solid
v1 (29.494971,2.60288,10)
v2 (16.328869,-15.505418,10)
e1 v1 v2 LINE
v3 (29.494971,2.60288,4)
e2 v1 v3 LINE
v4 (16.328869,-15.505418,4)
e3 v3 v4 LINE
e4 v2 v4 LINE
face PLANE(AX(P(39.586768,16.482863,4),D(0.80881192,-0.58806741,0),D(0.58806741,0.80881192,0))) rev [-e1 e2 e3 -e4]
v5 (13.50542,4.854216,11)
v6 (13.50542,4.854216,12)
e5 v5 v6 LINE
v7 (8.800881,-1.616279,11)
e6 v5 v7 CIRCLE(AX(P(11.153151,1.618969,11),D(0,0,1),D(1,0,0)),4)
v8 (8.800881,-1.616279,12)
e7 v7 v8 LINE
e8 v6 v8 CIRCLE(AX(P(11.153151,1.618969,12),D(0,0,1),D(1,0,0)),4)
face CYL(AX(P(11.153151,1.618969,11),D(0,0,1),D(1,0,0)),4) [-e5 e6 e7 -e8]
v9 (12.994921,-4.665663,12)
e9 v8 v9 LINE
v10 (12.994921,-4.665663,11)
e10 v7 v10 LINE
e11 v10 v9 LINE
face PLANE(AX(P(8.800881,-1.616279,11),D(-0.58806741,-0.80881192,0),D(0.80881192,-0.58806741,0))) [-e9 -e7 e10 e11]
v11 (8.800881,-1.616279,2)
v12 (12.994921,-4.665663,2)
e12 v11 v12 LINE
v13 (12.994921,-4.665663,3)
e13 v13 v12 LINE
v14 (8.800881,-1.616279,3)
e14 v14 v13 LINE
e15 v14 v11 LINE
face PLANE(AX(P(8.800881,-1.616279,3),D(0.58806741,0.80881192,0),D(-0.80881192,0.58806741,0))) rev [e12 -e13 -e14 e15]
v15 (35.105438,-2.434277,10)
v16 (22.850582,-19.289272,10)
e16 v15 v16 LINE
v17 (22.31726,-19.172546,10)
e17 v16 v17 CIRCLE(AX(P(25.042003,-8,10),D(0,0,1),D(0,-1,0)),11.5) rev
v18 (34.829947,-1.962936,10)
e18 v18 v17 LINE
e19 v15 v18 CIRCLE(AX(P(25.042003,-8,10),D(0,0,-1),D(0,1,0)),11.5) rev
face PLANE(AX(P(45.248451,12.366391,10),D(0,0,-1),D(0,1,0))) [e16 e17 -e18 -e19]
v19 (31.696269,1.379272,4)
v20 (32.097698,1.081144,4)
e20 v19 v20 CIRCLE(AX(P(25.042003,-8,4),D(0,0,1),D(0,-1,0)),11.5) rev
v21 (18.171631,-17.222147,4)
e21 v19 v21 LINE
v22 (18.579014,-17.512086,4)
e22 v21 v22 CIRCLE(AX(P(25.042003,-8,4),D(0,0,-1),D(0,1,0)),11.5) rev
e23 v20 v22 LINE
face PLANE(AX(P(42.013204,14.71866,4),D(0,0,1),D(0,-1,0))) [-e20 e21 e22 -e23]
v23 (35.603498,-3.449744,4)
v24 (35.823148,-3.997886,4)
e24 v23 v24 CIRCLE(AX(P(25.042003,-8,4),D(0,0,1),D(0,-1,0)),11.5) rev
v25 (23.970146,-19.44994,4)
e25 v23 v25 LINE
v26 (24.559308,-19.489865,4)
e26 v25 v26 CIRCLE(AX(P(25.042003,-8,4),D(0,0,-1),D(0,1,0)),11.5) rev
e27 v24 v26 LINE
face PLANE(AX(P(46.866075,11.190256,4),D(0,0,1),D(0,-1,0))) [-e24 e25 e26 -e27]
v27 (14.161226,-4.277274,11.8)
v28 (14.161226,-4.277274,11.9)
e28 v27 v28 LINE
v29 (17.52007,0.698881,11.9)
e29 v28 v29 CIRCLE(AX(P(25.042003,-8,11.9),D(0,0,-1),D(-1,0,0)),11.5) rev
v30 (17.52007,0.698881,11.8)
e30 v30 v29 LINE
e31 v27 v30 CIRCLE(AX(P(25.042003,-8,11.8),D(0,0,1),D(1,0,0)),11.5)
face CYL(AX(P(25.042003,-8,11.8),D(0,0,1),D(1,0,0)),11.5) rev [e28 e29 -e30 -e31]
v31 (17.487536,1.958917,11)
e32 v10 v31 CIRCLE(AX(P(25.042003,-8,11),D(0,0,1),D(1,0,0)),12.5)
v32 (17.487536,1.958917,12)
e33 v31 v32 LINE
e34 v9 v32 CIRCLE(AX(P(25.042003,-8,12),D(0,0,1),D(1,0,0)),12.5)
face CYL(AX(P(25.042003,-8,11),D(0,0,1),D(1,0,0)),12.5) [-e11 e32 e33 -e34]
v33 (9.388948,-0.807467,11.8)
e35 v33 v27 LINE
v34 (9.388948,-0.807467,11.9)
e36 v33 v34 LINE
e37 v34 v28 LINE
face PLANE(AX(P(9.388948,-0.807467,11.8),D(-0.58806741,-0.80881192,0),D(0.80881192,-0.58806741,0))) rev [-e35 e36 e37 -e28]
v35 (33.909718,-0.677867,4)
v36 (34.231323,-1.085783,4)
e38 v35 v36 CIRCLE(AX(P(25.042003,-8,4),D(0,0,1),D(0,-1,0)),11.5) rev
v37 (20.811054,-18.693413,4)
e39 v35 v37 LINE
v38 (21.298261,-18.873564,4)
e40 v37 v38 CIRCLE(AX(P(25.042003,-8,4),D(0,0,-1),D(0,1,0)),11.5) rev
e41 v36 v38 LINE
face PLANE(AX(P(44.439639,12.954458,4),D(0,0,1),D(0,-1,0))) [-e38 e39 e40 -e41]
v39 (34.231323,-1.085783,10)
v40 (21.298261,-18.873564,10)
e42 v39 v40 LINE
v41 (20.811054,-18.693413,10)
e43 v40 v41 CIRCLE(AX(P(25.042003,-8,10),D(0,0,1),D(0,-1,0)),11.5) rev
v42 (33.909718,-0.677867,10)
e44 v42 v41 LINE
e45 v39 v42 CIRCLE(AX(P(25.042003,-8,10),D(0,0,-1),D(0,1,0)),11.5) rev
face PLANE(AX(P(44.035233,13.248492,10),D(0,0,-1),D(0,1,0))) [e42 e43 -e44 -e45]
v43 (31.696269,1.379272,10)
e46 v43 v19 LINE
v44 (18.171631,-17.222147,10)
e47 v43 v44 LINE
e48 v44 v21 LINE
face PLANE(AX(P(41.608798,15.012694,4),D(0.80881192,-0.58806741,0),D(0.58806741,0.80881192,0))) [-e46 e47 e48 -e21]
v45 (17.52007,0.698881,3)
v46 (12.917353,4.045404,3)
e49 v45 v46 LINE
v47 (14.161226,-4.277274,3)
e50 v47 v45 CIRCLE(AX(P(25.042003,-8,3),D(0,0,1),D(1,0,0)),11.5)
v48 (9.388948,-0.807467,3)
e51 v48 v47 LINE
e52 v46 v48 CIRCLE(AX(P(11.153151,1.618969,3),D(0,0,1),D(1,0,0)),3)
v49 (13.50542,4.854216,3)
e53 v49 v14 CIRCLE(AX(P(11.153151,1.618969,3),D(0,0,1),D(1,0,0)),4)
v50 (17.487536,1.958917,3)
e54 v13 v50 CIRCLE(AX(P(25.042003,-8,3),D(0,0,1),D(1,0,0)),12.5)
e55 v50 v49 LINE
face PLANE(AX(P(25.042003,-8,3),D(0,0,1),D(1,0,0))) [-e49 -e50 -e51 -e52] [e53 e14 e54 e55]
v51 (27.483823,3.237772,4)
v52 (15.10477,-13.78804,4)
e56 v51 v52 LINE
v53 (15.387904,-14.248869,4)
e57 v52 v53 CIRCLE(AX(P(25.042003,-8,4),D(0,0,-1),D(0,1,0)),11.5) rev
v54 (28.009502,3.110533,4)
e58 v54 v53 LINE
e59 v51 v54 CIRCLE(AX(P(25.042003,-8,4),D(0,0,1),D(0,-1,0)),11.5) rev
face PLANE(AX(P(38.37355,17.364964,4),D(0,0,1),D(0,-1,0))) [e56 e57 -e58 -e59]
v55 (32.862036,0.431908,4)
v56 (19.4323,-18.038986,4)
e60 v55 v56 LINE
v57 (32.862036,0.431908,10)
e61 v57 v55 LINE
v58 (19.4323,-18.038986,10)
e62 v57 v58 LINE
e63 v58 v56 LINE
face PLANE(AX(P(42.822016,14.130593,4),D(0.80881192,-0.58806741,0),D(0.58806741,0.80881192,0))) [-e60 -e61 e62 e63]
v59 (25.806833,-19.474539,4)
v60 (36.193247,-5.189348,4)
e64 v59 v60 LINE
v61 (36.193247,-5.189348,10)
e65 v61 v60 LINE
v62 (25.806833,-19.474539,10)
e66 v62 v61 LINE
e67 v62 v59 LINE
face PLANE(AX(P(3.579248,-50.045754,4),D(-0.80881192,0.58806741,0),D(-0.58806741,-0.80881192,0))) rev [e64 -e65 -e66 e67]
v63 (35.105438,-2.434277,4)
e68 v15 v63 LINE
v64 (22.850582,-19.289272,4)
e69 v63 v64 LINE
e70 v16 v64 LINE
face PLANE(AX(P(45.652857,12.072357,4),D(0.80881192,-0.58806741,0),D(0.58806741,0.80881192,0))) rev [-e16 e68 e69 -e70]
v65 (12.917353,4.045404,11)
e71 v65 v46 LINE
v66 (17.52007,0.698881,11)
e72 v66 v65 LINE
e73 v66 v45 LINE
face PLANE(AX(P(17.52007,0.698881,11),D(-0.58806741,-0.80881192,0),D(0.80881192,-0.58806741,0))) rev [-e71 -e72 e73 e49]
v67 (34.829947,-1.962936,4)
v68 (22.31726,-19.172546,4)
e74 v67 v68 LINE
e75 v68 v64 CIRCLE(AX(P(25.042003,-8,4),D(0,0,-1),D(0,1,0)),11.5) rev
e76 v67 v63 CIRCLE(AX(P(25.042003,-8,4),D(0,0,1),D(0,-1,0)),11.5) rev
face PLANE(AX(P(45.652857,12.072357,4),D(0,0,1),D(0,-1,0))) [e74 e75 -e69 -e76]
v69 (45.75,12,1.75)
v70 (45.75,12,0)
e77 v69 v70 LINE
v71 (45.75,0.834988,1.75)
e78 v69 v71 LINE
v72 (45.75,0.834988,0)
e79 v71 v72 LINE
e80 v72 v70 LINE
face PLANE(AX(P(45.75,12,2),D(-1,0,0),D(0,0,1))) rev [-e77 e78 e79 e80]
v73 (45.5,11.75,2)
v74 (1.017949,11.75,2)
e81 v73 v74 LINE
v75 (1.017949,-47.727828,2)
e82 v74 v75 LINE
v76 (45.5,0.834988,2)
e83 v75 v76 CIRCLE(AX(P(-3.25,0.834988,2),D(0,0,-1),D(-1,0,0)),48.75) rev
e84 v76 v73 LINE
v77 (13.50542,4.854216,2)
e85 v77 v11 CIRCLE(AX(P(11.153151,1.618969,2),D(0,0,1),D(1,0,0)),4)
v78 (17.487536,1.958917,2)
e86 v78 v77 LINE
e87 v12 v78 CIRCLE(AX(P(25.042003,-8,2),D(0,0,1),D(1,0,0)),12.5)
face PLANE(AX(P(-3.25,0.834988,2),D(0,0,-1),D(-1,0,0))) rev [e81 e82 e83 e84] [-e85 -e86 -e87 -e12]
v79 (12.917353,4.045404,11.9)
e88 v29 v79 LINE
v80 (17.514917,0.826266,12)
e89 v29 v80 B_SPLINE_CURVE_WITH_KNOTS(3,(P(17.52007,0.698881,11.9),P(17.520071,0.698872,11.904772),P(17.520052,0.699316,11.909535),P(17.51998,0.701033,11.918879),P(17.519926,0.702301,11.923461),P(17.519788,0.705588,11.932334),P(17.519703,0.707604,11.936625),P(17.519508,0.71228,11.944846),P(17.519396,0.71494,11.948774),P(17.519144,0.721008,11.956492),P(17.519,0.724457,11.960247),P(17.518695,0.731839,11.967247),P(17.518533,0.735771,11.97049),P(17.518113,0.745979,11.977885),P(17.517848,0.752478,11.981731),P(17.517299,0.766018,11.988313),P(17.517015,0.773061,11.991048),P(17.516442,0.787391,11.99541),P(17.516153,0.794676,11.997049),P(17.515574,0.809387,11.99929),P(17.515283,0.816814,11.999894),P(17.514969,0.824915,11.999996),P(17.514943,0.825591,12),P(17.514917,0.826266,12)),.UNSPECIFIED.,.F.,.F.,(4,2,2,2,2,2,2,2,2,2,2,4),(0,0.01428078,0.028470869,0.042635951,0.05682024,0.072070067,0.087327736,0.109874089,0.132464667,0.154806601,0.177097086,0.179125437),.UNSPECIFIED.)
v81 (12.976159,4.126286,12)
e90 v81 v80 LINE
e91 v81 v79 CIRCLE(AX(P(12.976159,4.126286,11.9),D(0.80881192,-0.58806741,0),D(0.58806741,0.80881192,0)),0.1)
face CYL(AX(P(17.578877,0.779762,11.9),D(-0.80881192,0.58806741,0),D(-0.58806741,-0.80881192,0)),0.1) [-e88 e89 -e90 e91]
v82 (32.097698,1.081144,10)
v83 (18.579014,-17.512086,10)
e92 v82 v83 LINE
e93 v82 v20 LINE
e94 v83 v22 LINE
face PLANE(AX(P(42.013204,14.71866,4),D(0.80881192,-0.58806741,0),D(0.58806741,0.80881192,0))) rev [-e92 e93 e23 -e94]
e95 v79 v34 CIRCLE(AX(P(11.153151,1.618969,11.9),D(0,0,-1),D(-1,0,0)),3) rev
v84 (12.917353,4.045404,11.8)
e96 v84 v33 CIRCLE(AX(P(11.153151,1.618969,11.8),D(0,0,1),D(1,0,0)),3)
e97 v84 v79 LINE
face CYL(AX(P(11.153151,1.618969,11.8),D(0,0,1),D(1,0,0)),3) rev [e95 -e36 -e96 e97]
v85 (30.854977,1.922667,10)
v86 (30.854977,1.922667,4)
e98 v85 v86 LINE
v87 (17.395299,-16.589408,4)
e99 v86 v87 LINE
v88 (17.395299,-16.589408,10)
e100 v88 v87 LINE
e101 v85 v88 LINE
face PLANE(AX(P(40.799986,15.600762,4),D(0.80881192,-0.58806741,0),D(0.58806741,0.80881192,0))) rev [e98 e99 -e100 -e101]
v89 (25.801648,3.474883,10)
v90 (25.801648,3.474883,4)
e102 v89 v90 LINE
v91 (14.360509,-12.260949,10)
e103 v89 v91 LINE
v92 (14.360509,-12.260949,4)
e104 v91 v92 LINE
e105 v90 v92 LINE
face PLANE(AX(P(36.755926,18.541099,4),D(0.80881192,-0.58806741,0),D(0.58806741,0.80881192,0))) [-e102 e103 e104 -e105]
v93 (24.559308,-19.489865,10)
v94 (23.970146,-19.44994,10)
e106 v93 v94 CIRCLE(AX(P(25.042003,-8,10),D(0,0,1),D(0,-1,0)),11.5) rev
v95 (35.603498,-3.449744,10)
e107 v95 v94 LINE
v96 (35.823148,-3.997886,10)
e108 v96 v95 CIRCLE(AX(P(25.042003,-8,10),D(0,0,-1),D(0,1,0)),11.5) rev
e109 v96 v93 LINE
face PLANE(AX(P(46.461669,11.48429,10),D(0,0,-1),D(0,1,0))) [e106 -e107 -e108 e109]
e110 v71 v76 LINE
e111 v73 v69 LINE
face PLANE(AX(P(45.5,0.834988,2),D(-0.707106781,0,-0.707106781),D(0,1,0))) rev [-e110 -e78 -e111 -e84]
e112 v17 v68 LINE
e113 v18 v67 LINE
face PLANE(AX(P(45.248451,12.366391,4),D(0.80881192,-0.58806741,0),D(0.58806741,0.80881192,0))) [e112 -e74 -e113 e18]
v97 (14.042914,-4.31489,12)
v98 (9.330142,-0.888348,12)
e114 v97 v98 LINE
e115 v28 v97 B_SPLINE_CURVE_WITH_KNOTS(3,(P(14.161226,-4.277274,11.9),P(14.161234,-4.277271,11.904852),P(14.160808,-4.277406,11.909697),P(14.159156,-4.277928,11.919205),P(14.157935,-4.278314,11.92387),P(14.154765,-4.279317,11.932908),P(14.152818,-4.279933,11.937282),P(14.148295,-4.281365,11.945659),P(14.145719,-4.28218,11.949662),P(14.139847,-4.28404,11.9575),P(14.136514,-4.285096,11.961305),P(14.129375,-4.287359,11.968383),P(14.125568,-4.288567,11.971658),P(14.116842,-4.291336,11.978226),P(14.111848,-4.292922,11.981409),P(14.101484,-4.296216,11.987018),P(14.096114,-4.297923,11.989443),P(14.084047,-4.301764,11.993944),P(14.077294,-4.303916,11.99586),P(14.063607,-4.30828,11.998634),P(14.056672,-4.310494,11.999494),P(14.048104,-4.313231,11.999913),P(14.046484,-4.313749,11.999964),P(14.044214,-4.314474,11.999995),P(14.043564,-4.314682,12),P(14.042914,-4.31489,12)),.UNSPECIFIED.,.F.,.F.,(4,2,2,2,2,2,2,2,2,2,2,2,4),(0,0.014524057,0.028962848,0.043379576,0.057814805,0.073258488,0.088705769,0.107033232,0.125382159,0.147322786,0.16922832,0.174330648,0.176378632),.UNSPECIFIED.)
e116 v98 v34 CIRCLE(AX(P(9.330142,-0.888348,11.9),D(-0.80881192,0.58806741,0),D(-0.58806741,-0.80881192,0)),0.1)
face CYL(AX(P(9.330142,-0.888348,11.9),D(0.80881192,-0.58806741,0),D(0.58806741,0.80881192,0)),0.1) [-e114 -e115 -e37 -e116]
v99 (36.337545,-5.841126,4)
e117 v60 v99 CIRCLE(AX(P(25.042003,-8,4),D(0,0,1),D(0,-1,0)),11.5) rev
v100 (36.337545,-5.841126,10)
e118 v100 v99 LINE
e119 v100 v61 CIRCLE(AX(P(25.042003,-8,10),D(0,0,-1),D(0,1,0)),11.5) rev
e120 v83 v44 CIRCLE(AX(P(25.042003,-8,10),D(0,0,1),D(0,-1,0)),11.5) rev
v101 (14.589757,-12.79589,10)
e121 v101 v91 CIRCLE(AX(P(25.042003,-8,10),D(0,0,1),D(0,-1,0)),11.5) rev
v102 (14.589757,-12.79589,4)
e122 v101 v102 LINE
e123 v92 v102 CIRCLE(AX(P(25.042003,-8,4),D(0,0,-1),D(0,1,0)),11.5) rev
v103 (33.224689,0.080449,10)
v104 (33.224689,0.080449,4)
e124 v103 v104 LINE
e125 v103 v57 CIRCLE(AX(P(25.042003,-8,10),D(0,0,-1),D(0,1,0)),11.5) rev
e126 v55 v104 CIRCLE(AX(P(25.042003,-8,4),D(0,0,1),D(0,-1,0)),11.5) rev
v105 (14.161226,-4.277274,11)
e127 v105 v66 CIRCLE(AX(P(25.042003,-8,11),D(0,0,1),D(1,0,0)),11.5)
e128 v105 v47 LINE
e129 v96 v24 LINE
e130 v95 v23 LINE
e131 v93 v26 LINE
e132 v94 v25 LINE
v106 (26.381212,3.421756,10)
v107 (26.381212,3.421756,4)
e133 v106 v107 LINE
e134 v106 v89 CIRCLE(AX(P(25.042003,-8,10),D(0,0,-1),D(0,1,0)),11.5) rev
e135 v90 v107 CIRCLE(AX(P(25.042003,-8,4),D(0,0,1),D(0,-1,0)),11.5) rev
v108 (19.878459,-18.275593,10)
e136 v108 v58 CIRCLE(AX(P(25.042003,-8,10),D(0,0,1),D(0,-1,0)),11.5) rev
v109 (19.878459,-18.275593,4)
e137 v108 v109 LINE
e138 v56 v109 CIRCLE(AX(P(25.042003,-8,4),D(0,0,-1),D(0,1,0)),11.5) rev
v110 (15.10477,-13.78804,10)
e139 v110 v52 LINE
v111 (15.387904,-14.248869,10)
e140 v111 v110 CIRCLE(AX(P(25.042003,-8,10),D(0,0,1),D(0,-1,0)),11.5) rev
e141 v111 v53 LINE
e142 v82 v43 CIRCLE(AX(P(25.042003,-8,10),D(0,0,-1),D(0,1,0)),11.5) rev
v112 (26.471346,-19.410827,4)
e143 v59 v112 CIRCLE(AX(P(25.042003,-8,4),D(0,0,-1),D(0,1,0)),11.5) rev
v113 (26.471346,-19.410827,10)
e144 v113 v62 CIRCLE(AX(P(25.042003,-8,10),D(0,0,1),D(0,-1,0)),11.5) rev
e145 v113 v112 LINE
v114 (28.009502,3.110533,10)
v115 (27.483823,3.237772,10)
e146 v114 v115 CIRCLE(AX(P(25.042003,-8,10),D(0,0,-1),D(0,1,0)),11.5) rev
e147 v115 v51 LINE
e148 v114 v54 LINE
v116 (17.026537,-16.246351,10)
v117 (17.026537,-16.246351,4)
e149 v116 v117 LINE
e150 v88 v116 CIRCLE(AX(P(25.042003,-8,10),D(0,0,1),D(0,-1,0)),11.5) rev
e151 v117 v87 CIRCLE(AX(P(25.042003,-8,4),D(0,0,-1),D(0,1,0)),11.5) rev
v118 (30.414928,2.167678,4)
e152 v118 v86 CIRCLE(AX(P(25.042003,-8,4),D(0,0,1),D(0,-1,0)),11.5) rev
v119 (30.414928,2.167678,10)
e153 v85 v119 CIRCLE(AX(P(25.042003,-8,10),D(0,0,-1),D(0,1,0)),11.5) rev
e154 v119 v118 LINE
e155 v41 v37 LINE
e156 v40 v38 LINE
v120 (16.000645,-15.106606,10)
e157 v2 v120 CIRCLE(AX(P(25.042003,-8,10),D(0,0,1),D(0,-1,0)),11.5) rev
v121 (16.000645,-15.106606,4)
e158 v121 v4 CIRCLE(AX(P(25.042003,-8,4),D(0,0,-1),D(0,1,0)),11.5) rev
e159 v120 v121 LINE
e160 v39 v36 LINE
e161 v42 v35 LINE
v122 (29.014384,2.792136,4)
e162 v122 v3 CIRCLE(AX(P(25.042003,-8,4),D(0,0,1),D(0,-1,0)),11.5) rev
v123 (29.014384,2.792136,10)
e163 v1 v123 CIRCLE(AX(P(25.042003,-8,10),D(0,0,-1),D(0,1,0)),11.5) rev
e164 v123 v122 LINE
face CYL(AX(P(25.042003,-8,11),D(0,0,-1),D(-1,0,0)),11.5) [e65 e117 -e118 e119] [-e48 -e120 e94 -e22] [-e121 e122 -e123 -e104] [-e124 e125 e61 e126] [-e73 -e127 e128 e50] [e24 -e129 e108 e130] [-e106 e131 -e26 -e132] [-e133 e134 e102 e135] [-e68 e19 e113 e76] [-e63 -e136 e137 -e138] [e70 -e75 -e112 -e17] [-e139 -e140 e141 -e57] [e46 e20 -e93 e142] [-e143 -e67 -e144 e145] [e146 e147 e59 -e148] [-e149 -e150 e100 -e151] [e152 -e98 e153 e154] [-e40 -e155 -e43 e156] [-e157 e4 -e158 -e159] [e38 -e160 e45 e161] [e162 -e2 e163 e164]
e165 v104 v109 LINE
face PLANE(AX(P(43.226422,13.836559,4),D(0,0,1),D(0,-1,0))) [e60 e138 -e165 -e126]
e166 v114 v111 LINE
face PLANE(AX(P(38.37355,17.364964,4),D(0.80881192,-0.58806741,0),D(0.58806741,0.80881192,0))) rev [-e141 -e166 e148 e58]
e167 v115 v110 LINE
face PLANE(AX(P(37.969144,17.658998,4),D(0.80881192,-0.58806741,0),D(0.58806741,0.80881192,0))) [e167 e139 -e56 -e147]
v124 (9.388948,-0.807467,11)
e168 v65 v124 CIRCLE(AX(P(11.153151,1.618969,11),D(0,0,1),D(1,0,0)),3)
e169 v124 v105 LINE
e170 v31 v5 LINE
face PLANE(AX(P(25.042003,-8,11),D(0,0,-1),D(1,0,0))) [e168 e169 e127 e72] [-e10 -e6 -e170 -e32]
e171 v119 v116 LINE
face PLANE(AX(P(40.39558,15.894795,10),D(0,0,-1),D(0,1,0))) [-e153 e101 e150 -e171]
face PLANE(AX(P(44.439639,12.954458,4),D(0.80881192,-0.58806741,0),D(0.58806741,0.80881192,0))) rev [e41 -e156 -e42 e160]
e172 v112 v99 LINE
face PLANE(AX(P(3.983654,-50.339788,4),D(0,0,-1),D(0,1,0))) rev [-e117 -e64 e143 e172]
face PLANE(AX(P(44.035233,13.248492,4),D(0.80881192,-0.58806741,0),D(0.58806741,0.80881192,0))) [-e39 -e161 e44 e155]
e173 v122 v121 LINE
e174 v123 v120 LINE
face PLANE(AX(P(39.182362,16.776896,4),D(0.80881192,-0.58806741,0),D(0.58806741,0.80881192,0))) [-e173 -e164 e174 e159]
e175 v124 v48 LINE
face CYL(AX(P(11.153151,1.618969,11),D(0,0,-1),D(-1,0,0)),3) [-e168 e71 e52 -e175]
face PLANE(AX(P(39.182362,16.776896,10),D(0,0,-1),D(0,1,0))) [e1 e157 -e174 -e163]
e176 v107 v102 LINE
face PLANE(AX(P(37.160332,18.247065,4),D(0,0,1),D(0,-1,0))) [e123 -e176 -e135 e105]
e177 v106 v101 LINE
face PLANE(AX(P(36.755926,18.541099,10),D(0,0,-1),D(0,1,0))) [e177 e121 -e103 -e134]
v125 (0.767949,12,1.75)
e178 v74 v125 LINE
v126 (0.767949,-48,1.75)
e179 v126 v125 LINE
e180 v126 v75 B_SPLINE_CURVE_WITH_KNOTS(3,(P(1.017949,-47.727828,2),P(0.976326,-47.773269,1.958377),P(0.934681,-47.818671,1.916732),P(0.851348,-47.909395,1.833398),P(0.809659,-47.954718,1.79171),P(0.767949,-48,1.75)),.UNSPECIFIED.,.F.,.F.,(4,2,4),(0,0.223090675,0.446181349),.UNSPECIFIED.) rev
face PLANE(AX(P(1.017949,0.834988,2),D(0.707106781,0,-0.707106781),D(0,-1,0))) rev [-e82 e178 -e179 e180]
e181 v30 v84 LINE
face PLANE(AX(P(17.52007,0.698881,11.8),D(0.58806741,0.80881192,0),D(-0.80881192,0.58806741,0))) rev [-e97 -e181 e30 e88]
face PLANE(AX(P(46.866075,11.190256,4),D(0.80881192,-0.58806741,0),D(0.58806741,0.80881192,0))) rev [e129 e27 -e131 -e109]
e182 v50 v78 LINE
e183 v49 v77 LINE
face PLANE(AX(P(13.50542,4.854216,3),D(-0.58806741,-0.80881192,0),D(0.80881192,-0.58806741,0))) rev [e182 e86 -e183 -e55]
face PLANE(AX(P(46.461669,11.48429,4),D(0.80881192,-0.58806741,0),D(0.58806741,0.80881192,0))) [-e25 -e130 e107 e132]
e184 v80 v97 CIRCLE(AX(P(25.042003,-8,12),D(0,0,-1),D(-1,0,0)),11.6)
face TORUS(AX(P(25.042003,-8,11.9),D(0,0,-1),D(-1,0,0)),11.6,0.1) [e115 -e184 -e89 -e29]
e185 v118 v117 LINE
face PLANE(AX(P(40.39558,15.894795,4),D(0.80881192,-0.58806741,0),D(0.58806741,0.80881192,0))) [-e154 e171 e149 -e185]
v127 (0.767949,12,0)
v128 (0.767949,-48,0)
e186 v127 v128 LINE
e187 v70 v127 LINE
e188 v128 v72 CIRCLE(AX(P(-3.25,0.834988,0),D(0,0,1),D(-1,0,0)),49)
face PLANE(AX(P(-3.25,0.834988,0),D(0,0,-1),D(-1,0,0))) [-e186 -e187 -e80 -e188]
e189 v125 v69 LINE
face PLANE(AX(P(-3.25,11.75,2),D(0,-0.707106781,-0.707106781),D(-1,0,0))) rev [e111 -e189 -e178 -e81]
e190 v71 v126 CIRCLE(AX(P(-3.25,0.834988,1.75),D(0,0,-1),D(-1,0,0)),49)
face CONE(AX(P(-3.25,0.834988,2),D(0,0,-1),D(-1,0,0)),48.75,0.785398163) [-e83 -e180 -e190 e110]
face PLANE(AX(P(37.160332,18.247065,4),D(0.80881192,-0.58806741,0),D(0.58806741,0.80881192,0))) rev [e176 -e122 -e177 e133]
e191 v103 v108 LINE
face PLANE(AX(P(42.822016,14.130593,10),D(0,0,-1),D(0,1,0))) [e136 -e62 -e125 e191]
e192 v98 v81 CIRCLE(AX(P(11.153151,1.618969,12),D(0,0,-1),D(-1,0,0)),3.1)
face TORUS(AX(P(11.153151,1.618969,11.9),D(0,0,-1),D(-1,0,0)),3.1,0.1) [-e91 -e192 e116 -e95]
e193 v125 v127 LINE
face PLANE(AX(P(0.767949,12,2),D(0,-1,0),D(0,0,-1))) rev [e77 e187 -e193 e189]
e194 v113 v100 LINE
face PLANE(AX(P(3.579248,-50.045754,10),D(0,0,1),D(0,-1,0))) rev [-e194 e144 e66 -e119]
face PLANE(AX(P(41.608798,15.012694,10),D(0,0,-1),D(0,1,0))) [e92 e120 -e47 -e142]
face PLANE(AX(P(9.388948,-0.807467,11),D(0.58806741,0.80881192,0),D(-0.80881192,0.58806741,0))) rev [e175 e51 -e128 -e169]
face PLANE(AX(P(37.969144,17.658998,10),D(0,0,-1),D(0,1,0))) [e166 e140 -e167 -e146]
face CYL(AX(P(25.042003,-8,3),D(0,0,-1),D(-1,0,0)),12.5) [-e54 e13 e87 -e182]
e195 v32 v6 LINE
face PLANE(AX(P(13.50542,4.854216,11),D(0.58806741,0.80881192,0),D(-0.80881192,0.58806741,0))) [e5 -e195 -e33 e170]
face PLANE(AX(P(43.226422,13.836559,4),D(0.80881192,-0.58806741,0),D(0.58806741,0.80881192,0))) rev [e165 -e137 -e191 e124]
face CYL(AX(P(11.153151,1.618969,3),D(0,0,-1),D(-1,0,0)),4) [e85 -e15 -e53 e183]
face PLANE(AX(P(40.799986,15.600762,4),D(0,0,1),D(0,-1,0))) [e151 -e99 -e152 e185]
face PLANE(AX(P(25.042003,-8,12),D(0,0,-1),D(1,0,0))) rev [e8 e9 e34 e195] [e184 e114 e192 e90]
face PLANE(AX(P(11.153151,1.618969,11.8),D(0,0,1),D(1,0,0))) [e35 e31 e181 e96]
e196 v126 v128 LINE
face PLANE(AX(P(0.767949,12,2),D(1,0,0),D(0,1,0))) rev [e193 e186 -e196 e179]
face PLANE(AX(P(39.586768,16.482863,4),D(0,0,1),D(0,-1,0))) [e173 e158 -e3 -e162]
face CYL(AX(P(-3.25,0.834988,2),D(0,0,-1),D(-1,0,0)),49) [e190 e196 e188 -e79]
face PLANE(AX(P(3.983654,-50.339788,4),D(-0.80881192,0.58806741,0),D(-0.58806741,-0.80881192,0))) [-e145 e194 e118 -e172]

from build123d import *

# Parameters (mm, degrees)
BOSS_EXTRUDE1_DEPTH         = 2
BOSS_EXTRUDE2_DEPTH         = 1
CHAMFER1_SIZE               = 0.25
BOSS_EXTRUDE3_DEPTH         = 8
CUT_EXTRUDE_THIN1_START     = -11.887644895
CUT_EXTRUDE_THIN1_OUTLINE_W = 0.5
CUT_EXTRUDE_THIN1_OUTLINE_H = 6
CUT_EXTRUDE_THIN1_DEPTH     = 23
CUT_EXTRUDE1_START          = -0.2
CUT_EXTRUDE1_DEPTH          = 0.2
FILLET1_R                   = 0.1


# Read off the part's stored shape, not the designer's step: Cut-Extrude-Thin1
with BuildPart() as part:
    # Sketch1 → Boss-Extrude1 (new body)
    with BuildSketch(Plane.XY):
        with BuildLine():
            Line((0.767949192, 12), (0.767949192, -48))
            ThreePointArc((0.767949192, -48), (32.790806806, -32.362304412), (45.75, 0.834988321))
            Line((45.75, 0.834988321), (45.75, 12))
            Line((45.75, 12), (0.767949192, 12))
        make_face()
    extrude(amount=BOSS_EXTRUDE1_DEPTH)

    # Sketch2 → Boss-Extrude2 (add)
    with BuildSketch(Plane.XY.offset(2)):
        with BuildLine():
            Line((8.80088089, -1.616278944), (12.994920502, -4.6656628))
            ThreePointArc((12.994920502, -4.6656628), (35.387361749, -15.015949775), (17.487536068, 1.958917118))
            Line((17.487536068, 1.958917118), (13.505420168, 4.854216415))
            ThreePointArc((13.505420168, 4.854216415), (7.91790285, 3.971238374), (8.80088089, -1.616278944))
        make_face()
    boss_extrude2 = extrude(amount=BOSS_EXTRUDE2_DEPTH)

    # Chamfer1
    chamfer1_edges = [part.edges().sort_by_distance(p)[0] for p in [
        (32.790806806, -32.362304412, 2),
        (45.75, 6.41749416, 2),
        (23.258974596, 12, 2),
        (0.767949192, -18, 2),
    ]]
    chamfer(chamfer1_edges, length=CHAMFER1_SIZE)

    # Sketch4 → Boss-Extrude3 (add)
    with BuildSketch(Plane.XY.offset(3)):
        with BuildLine():
            Line((17.520070281, 0.698880903), (12.917352758, 4.045404495))
            ThreePointArc((12.917352758, 4.045404495), (8.726714769, 3.383170965), (9.3889483, -0.807467024))
            Line((9.3889483, -0.807467024), (14.161225934, -4.277273635))
            ThreePointArc((14.161225934, -4.277273635), (34.573815964, -14.433858921), (17.520070281, 0.698880903))
        make_face()
    extrude(amount=BOSS_EXTRUDE3_DEPTH)

    # Mirror1: Boss-Extrude2 across plane
    add(boss_extrude2.mirror(Plane.XY.offset(7)))

    # Cut-Extrude-Thin1 outline → Cut-Extrude-Thin1 (cut)
    with BuildSketch(Plane(origin=(4.627058781, 6.363930791, 0), x_dir=(-0.8088119198432459, 0.5880674096729752, 0), z_dir=(-0.5880674096729752, -0.8088119198432459, 0)).offset(CUT_EXTRUDE_THIN1_START)):
        with Locations((-32.575215368, -7)):
            Rectangle(CUT_EXTRUDE_THIN1_OUTLINE_W, CUT_EXTRUDE_THIN1_OUTLINE_H)
        with Locations((-29.575215368, -7)):
            Rectangle(CUT_EXTRUDE_THIN1_OUTLINE_W, CUT_EXTRUDE_THIN1_OUTLINE_H)
        with Locations((-26.575215368, -7)):
            Rectangle(CUT_EXTRUDE_THIN1_OUTLINE_W, CUT_EXTRUDE_THIN1_OUTLINE_H)
        with Locations((-23.575215368, -7)):
            Rectangle(CUT_EXTRUDE_THIN1_OUTLINE_W, CUT_EXTRUDE_THIN1_OUTLINE_H)
        with Locations((-31.075215368, -7)):
            Rectangle(CUT_EXTRUDE_THIN1_OUTLINE_W, CUT_EXTRUDE_THIN1_OUTLINE_H)
        with Locations((-28.075215368, -7)):
            Rectangle(CUT_EXTRUDE_THIN1_OUTLINE_W, CUT_EXTRUDE_THIN1_OUTLINE_H)
        with Locations((-25.075215368, -7)):
            Rectangle(CUT_EXTRUDE_THIN1_OUTLINE_W, CUT_EXTRUDE_THIN1_OUTLINE_H)
        with Locations((-22.075215368, -7)):
            Rectangle(CUT_EXTRUDE_THIN1_OUTLINE_W, CUT_EXTRUDE_THIN1_OUTLINE_H)
        with Locations((-20.575215368, -7)):
            Rectangle(CUT_EXTRUDE_THIN1_OUTLINE_W, CUT_EXTRUDE_THIN1_OUTLINE_H)
        with Locations((-19.075215368, -7)):
            Rectangle(CUT_EXTRUDE_THIN1_OUTLINE_W, CUT_EXTRUDE_THIN1_OUTLINE_H)
    extrude(amount=CUT_EXTRUDE_THIN1_DEPTH, mode=Mode.SUBTRACT)

    # Sketch9 → Cut-Extrude1 (cut)
    with BuildSketch(Plane.XY.offset(12).offset(CUT_EXTRUDE1_START)):
        with BuildLine():
            Line((17.520070281, 0.698880903), (12.917352758, 4.045404495))
            ThreePointArc((12.917352758, 4.045404495), (8.726714769, 3.383170965), (9.3889483, -0.807467024))
            Line((9.3889483, -0.807467024), (14.161225934, -4.277273635))
            ThreePointArc((14.161225934, -4.277273635), (34.573815964, -14.433858921), (17.520070281, 0.698880903))
        make_face()
    extrude(amount=CUT_EXTRUDE1_DEPTH, mode=Mode.SUBTRACT)

    # Fillet1
    fillet1_edges = [part.edges().sort_by_distance(p)[0] for p in [
        (8.726714769, 3.383170965, 12),
        (11.775087117, -2.542370329, 12),
        (34.573815964, -14.433858921, 12),
        (15.21871152, 2.372142699, 12),
    ]]
    fillet(fillet1_edges, radius=FILLET1_R)


solid = part.part
